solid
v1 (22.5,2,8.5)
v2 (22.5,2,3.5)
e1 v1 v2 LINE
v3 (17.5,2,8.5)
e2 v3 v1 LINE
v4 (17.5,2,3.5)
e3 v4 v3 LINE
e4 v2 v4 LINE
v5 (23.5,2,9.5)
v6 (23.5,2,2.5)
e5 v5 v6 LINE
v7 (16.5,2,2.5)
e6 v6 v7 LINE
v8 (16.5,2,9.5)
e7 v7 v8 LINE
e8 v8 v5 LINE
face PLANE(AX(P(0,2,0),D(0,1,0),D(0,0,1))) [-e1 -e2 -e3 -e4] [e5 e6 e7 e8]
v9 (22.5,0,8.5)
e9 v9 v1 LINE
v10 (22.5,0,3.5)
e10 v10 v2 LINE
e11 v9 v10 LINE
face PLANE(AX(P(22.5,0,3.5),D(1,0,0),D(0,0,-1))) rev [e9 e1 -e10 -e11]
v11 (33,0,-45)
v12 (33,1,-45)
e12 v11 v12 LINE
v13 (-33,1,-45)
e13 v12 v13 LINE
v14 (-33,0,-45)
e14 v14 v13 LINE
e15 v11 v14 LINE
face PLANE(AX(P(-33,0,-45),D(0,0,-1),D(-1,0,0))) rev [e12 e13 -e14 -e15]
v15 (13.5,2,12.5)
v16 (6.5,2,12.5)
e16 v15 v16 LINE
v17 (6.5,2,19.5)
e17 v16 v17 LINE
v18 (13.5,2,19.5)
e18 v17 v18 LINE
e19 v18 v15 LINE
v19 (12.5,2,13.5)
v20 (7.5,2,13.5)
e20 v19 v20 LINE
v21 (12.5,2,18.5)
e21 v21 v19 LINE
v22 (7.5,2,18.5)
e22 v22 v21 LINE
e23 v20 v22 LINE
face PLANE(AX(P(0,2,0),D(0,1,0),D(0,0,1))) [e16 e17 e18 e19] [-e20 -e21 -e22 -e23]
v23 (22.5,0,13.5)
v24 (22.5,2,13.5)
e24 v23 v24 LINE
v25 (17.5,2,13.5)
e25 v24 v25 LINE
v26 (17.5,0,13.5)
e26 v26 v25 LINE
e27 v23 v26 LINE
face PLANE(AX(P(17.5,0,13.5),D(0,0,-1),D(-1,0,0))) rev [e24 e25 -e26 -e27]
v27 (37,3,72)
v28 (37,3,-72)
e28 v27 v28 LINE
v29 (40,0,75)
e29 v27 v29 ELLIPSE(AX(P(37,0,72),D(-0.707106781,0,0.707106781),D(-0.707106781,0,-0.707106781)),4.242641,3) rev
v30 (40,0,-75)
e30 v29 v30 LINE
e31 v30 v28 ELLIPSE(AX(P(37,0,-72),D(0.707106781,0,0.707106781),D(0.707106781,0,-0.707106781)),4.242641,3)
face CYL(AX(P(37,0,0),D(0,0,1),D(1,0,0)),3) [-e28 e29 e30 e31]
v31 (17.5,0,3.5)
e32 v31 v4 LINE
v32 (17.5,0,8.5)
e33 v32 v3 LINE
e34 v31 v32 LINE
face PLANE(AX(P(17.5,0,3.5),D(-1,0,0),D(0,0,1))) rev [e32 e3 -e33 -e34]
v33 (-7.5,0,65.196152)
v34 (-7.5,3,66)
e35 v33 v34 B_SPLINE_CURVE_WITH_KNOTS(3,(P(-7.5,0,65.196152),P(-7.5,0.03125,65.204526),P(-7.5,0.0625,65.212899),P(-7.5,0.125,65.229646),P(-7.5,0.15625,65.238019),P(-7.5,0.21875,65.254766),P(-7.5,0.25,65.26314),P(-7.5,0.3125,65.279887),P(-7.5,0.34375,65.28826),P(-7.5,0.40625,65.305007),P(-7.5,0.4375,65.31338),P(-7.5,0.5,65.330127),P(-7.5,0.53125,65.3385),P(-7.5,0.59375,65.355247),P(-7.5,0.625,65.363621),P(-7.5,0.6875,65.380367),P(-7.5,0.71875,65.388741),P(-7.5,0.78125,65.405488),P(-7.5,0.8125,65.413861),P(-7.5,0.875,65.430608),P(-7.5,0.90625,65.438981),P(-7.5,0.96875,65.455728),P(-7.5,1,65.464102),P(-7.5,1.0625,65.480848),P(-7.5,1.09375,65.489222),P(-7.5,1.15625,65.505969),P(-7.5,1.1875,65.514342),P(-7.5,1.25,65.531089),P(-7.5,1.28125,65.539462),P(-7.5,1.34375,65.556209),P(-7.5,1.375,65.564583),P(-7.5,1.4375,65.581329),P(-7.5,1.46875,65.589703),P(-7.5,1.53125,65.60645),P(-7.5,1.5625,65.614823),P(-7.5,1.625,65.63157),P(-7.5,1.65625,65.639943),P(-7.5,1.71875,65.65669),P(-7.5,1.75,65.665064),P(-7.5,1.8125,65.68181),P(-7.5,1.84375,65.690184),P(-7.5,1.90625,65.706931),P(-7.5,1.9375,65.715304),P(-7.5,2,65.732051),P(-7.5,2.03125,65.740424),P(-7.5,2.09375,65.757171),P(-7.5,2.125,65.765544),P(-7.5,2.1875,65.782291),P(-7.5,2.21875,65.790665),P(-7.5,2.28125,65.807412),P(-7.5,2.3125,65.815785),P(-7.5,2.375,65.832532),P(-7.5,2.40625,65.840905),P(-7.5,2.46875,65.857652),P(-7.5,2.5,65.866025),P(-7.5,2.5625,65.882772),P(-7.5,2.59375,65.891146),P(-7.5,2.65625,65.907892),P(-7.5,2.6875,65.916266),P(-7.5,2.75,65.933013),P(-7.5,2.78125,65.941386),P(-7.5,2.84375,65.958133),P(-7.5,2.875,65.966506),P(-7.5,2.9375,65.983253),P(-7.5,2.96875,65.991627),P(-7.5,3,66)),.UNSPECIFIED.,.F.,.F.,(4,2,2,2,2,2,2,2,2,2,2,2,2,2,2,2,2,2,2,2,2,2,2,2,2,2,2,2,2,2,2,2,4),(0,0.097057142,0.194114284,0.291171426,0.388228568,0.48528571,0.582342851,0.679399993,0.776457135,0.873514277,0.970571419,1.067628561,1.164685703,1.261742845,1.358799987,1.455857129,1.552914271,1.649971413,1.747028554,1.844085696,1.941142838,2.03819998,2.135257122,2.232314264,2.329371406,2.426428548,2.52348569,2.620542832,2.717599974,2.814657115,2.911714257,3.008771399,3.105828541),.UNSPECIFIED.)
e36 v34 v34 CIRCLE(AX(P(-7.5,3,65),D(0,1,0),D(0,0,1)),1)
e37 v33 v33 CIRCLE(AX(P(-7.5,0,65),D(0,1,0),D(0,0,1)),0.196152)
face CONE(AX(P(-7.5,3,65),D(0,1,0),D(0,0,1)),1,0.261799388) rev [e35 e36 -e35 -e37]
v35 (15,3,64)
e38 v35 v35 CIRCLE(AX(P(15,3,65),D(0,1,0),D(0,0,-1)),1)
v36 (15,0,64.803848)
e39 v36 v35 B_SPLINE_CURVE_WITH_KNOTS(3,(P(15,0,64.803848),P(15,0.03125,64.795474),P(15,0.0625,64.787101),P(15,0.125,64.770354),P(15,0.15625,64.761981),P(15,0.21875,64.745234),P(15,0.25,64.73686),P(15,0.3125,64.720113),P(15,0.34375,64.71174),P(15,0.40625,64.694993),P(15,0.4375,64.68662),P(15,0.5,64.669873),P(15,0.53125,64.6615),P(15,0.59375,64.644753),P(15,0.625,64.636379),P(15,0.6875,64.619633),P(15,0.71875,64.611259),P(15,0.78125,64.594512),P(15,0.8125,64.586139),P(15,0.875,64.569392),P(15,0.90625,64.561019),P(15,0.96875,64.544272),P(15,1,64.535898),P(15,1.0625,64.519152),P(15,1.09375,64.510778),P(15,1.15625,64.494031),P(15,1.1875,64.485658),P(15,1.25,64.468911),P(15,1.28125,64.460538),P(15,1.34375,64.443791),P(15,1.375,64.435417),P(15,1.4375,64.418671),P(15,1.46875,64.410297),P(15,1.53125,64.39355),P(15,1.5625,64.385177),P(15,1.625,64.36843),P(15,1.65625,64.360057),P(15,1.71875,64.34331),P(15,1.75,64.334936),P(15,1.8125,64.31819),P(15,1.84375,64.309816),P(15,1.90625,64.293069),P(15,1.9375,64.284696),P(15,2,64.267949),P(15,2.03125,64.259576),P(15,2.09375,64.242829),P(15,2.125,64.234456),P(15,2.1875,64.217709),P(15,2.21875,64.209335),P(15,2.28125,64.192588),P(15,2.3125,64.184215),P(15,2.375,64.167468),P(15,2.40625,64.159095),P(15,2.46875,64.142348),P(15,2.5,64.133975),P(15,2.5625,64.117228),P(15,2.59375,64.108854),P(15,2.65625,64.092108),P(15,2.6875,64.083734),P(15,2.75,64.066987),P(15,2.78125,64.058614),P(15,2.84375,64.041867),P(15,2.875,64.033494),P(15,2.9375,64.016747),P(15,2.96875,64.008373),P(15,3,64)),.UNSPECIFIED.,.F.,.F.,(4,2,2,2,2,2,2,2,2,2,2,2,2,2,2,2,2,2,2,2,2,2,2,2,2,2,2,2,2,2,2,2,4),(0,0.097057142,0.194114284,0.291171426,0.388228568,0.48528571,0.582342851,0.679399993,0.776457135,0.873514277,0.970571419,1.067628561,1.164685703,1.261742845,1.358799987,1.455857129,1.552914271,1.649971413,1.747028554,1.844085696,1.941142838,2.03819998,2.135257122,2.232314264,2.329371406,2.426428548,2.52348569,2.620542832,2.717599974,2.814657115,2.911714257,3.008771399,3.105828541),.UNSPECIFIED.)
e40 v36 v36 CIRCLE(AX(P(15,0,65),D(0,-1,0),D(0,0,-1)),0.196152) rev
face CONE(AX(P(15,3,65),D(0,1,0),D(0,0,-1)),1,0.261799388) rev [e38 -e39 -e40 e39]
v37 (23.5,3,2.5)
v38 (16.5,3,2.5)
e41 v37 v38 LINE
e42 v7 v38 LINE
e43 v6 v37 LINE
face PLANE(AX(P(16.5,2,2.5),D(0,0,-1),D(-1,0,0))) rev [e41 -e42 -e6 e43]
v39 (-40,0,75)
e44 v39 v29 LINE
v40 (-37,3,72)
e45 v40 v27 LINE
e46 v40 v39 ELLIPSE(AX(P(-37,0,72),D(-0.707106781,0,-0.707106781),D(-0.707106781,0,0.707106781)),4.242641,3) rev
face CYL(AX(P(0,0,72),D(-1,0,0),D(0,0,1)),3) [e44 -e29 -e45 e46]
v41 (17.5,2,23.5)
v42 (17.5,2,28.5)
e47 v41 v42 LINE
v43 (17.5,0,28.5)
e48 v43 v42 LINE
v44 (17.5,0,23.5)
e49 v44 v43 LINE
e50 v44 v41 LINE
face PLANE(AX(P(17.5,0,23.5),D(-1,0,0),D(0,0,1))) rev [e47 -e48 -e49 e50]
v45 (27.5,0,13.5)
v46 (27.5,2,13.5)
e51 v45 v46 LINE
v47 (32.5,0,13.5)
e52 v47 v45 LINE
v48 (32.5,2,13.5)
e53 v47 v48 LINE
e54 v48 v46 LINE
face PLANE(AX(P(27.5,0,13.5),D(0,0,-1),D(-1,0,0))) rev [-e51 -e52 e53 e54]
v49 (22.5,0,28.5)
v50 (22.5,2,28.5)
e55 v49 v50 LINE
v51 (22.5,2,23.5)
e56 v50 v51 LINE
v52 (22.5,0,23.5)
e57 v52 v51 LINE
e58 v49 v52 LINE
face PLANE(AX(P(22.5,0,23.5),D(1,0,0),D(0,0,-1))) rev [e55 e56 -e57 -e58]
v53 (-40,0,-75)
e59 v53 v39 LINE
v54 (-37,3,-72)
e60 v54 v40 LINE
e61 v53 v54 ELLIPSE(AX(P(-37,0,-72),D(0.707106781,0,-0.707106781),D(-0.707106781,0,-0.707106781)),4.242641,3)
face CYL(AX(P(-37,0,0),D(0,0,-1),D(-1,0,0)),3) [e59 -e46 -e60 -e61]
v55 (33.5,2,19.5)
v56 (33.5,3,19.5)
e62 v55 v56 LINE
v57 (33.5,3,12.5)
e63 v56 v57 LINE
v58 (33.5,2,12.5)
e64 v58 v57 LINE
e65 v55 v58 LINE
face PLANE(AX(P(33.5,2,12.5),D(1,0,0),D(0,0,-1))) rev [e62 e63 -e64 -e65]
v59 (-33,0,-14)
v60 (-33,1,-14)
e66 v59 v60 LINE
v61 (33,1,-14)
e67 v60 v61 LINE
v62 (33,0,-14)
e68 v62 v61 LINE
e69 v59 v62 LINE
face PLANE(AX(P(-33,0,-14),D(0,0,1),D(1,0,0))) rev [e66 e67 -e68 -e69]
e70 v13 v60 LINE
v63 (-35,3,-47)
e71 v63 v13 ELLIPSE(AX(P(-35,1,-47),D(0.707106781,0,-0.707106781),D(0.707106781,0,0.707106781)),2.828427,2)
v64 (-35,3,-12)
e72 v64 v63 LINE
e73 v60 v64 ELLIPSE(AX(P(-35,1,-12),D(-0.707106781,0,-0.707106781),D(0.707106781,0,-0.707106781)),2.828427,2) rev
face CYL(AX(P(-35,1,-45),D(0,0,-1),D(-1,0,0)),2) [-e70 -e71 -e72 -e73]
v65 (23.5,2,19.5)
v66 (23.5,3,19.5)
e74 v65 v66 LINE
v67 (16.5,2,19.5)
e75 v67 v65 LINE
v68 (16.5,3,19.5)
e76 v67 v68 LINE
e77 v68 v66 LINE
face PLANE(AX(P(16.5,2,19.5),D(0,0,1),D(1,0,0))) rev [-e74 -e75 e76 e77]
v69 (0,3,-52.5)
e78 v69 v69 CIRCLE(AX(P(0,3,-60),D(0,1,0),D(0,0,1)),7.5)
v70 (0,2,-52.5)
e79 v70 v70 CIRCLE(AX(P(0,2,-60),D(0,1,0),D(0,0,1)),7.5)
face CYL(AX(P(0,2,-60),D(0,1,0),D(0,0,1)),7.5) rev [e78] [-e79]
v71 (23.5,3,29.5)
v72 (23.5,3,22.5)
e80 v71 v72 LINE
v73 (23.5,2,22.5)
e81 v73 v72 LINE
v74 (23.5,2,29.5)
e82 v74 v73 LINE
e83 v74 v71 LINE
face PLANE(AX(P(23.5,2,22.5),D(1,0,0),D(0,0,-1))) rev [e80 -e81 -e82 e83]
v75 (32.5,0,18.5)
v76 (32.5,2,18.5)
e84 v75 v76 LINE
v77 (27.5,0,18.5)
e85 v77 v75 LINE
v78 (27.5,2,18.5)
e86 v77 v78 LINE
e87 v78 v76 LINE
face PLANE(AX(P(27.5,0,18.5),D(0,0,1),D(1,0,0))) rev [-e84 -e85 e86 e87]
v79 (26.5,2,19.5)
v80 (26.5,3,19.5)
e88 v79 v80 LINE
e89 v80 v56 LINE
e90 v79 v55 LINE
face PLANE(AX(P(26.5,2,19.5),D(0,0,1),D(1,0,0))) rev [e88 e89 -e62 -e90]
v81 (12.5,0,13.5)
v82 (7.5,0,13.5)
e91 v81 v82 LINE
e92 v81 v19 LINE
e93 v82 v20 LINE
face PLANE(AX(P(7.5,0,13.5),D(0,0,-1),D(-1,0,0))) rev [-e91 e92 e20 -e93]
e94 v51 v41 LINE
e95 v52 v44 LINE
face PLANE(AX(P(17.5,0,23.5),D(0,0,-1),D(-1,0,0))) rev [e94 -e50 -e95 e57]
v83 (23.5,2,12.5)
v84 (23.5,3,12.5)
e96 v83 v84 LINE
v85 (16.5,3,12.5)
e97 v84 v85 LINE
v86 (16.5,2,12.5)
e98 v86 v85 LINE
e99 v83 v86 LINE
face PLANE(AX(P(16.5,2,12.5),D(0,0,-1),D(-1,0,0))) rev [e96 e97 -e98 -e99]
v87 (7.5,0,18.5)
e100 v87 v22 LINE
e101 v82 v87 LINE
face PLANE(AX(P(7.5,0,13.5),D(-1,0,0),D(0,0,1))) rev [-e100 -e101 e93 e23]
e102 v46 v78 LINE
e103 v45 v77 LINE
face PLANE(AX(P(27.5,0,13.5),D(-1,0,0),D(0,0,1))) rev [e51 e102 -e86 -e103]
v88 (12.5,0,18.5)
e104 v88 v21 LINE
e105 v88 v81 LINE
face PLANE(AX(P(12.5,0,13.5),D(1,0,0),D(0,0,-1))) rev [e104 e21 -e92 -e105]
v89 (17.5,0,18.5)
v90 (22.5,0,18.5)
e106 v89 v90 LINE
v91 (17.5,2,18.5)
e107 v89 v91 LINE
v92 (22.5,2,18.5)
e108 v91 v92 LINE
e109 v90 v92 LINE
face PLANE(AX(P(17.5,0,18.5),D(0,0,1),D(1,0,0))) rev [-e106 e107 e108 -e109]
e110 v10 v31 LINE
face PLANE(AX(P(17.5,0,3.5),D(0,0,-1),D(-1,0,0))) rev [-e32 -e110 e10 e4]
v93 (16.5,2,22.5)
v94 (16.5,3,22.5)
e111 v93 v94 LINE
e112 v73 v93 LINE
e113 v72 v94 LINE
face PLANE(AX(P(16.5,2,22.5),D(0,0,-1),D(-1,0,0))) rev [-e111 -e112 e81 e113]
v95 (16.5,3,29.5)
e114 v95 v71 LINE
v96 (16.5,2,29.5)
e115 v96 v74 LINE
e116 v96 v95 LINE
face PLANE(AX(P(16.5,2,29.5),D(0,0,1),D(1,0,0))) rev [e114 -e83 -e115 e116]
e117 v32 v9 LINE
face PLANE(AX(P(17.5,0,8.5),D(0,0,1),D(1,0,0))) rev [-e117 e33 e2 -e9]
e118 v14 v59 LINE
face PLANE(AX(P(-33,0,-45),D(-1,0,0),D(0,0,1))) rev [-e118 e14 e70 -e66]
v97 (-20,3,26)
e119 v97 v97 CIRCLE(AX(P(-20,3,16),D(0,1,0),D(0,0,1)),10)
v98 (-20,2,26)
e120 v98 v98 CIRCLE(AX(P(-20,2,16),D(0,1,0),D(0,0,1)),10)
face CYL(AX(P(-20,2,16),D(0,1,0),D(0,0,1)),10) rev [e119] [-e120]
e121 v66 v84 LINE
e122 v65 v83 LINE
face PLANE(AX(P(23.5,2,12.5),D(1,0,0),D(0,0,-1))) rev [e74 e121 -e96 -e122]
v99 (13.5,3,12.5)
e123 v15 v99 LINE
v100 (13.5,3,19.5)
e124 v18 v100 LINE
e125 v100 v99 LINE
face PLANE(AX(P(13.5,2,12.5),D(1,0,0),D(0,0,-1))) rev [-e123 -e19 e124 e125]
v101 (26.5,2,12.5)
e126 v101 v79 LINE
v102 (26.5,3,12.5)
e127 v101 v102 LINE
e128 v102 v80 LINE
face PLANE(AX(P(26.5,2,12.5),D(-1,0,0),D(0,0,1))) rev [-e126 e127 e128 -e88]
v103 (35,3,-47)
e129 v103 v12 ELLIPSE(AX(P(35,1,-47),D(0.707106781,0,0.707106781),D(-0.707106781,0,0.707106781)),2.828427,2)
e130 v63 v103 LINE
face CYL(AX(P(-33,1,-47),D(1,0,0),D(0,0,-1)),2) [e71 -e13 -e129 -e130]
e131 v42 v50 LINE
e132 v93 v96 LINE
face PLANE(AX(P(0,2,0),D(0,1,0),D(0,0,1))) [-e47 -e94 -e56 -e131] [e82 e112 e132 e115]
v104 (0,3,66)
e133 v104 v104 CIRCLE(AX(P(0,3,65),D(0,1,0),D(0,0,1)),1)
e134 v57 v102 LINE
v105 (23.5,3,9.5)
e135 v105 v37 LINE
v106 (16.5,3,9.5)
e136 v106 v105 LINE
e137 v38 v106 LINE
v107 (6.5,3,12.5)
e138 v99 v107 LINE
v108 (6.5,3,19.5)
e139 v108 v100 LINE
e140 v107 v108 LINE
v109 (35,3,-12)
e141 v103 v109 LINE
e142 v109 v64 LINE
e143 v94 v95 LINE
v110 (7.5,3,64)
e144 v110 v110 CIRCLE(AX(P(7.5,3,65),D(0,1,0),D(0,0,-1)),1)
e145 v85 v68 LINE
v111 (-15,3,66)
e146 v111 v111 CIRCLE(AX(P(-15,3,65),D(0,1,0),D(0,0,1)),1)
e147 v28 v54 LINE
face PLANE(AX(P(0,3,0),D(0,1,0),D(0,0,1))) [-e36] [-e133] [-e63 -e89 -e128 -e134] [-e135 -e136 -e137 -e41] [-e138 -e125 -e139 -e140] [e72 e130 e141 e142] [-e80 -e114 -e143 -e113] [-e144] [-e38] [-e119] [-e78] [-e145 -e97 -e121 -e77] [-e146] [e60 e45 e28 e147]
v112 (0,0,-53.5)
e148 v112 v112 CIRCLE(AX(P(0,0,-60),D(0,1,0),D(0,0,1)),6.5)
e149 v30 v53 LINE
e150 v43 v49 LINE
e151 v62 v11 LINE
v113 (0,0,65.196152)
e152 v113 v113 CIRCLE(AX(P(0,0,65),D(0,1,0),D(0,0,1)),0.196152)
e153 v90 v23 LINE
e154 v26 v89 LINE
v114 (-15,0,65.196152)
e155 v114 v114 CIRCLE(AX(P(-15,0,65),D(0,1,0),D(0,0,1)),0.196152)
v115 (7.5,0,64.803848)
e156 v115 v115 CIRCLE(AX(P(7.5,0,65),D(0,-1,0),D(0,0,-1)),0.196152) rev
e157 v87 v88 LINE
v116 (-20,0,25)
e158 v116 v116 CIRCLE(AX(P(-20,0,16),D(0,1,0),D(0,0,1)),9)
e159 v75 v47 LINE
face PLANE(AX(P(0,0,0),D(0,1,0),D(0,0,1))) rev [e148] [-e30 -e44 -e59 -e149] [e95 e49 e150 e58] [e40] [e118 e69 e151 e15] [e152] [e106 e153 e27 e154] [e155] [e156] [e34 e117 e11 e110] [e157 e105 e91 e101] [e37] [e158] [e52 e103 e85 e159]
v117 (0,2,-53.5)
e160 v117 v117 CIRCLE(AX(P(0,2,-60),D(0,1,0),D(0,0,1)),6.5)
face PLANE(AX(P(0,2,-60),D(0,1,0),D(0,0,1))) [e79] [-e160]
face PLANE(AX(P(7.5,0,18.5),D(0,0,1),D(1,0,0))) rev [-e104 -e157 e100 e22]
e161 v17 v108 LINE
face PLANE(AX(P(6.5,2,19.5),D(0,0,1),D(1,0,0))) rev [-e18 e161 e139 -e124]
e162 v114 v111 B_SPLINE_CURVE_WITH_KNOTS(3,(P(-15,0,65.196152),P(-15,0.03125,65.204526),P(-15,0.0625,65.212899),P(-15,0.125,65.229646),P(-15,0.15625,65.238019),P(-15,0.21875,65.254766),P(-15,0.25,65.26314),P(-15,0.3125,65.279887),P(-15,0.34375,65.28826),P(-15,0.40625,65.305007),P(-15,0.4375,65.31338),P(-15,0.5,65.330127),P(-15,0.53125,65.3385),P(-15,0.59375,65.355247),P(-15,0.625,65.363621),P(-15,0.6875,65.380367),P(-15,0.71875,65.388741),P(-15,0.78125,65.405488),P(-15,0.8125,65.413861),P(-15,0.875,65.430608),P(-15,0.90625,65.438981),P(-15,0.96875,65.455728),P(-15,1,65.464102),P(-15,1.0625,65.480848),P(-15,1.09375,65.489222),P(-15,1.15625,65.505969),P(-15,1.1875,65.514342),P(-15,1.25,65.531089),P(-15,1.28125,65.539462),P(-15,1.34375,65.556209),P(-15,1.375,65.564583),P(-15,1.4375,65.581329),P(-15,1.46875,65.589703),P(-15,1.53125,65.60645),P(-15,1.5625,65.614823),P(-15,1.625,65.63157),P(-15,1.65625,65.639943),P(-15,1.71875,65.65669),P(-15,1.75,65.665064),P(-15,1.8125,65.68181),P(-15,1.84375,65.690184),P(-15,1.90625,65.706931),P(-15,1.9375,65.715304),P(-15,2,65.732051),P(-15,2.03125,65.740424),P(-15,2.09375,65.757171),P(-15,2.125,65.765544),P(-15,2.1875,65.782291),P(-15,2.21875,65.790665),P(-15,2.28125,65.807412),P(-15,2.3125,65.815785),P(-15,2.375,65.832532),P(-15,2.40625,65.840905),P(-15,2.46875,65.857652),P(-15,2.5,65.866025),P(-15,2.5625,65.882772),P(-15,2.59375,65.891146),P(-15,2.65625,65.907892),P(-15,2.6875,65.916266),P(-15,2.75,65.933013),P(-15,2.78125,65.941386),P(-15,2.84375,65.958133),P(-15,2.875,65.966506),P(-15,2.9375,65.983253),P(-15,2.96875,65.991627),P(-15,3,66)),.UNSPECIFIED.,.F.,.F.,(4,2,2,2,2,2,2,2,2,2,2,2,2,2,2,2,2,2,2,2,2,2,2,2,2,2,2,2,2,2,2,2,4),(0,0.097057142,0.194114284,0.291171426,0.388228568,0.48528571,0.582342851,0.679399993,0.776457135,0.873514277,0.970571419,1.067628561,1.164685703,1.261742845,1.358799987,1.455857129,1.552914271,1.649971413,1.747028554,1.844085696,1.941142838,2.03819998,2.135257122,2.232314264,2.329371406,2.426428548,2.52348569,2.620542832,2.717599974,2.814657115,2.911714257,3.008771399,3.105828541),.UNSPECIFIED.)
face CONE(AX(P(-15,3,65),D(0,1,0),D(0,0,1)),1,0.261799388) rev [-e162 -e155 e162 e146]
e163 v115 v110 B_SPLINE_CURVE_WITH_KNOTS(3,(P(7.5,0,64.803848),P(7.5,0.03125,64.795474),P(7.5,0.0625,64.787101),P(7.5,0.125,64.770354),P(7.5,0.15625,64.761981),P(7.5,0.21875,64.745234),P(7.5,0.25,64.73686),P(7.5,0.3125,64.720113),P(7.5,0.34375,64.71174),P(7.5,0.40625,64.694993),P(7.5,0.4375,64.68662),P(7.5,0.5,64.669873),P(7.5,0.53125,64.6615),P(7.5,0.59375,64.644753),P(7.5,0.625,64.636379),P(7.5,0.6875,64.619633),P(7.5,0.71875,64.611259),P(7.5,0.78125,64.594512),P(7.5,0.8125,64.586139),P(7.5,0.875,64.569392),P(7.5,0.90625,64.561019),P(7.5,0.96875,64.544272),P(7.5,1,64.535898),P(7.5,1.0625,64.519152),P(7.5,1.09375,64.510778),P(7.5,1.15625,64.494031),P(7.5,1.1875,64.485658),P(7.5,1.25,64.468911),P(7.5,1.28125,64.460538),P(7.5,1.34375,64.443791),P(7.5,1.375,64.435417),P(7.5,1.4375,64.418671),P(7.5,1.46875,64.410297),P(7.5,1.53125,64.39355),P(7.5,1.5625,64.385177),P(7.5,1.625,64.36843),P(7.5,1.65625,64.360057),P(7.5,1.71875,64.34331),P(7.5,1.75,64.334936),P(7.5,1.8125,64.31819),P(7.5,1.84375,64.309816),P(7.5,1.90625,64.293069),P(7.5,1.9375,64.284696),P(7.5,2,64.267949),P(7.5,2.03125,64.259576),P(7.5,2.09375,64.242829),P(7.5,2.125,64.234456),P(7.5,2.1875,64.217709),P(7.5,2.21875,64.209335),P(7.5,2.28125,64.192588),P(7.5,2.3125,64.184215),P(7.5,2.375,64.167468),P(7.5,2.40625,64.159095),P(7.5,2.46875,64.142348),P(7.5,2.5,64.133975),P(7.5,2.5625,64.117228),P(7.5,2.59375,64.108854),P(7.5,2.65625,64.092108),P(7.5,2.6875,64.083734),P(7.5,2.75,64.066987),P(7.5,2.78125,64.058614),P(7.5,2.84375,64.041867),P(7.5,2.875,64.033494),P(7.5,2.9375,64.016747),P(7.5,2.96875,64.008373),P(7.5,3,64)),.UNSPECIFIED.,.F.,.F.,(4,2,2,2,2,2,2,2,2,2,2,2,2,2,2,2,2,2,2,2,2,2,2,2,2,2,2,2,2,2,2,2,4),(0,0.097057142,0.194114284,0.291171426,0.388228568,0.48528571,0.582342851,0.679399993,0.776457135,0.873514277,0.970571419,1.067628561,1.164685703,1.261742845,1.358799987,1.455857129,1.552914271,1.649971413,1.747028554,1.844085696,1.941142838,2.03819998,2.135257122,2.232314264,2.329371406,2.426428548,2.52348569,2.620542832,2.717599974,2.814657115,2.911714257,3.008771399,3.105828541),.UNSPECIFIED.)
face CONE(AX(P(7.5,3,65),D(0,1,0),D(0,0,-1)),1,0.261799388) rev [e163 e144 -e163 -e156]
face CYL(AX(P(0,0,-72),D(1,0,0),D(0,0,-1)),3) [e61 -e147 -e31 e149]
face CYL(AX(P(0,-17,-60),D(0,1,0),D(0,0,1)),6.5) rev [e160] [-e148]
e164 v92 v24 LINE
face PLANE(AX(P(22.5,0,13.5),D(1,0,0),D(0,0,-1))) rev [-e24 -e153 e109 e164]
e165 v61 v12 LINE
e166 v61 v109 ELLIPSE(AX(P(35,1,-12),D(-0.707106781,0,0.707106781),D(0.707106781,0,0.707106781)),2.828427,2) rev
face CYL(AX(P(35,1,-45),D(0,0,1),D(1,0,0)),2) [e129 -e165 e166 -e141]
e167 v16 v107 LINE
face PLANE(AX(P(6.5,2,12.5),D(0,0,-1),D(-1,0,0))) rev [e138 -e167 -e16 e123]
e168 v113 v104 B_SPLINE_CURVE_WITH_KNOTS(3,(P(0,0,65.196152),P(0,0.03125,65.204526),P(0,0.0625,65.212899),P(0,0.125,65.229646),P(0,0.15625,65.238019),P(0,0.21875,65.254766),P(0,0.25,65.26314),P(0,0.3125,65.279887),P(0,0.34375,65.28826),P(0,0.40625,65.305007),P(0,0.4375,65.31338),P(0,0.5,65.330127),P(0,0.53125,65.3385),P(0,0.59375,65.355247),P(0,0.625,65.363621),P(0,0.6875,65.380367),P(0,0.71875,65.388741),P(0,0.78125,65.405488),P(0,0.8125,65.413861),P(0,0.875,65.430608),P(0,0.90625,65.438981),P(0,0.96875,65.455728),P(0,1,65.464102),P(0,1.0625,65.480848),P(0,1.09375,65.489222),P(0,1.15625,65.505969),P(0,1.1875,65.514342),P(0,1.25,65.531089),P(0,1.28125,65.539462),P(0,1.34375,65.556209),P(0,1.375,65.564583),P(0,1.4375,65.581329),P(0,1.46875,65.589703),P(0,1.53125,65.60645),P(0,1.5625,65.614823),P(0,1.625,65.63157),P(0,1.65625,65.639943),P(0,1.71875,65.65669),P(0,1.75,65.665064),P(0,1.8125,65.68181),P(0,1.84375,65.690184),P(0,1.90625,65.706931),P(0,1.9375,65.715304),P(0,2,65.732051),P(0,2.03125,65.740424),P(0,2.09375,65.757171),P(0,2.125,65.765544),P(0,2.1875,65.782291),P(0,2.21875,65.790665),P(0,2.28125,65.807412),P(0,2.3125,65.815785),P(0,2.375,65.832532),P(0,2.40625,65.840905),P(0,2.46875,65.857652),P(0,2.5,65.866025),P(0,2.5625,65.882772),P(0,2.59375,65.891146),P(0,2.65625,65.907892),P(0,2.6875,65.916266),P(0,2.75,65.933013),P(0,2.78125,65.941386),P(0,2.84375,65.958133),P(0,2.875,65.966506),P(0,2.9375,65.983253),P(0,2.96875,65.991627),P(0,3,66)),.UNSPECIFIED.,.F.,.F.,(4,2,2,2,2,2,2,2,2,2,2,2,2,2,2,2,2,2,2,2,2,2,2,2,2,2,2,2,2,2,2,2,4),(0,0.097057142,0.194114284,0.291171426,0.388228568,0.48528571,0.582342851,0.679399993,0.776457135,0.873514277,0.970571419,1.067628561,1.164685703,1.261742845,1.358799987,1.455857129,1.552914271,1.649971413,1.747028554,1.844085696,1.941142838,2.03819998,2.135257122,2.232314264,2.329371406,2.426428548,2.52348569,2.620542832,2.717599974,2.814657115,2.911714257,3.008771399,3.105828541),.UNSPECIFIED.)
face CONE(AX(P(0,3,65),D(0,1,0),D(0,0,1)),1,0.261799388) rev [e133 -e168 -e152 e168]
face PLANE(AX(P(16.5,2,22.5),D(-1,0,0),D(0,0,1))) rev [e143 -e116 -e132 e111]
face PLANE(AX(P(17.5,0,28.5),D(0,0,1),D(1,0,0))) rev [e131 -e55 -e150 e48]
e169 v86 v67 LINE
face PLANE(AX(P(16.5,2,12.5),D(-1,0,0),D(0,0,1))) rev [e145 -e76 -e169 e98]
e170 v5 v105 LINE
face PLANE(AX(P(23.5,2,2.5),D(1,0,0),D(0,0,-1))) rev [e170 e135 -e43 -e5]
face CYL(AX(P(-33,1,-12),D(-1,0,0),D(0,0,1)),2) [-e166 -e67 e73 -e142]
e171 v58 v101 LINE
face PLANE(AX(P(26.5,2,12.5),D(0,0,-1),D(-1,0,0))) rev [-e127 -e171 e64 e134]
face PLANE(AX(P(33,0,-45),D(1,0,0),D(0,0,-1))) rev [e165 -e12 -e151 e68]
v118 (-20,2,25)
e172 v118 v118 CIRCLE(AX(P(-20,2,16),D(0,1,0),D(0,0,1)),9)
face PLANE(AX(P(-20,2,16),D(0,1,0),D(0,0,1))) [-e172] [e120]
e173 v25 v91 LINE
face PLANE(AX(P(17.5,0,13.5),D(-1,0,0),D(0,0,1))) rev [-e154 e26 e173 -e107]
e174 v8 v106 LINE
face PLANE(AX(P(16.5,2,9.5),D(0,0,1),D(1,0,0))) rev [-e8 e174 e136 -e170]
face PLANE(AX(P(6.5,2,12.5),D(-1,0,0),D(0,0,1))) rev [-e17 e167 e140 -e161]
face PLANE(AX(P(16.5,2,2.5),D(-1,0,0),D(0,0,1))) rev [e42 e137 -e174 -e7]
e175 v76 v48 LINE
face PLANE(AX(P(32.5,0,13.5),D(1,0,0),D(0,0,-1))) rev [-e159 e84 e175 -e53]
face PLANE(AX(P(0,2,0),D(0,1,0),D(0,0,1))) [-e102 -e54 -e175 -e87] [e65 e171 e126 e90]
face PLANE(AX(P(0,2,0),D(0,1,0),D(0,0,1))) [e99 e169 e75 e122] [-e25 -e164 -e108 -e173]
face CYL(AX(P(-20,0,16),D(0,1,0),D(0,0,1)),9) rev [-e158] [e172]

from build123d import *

# Parameters (mm, degrees)
SKETCH1_W           = 80
SKETCH1_H           = 150
BOSS_EXTRUDE1_DEPTH = 3
SKETCH2_W           = 66
SKETCH2_H           = 31
CUT_EXTRUDE1_DEPTH  = 3
SKETCH4_R           = 7.5
CUT_EXTRUDE2_DEPTH  = 1
SKETCH5_R           = 6.5
CUT_EXTRUDE3_DEPTH  = 19
SKETCH6_R           = 10
CUT_EXTRUDE4_DEPTH  = 1
SKETCH8_R           = 9
CUT_EXTRUDE5_DEPTH  = 86.023526156
SKETCH9_W           = 7
SKETCH9_H           = 7
CUT_EXTRUDE6_DEPTH  = 1
SKETCH12_W          = 5
SKETCH12_H          = 5
CUT_EXTRUDE7_DEPTH  = 86.023526156
FILLET1_R           = 3
FILLET2_R           = 2
SKETCH15_W          = 7
SKETCH15_H          = 7
CUT_EXTRUDE9_DEPTH  = 1
SKETCH16_W          = 5
SKETCH16_H          = 5
CUT_EXTRUDE10_DEPTH = 86.023526156


with BuildPart() as part:
    # Sketch1 → Boss-Extrude1 (new body)
    with BuildSketch(Plane(origin=(0, 0, 0), x_dir=(1, 0, 0), z_dir=(0, 1, 0))):
        Rectangle(SKETCH1_W, SKETCH1_H)
    extrude(amount=BOSS_EXTRUDE1_DEPTH)

    # Sketch2 → Cut-Extrude1 (cut)
    with BuildSketch(Plane(origin=(0, 3, 0), x_dir=(1, 0, 0), z_dir=(0, 1, 0))):
        with Locations((0, 29.5)):
            Rectangle(SKETCH2_W, SKETCH2_H)
    extrude(amount=-CUT_EXTRUDE1_DEPTH, mode=Mode.SUBTRACT)

    # Sketch4 → Cut-Extrude2 (cut)
    with BuildSketch(Plane(origin=(0, 3, 0), x_dir=(1, 0, 0), z_dir=(0, 1, 0))):
        with Locations(Location((0, 60, 0), (0, 0, 270))):
            Circle(SKETCH4_R)
    extrude(amount=-CUT_EXTRUDE2_DEPTH, mode=Mode.SUBTRACT)

    # Sketch5 → Cut-Extrude3 (cut)
    with BuildSketch(Plane(origin=(0, 2, 0), x_dir=(1, 0, 0), z_dir=(0, 1, 0))):
        with Locations(Location((0, 60, 0), (0, 0, 270))):
            Circle(SKETCH5_R)
    extrude(amount=-CUT_EXTRUDE3_DEPTH, mode=Mode.SUBTRACT)

    # Sketch6 → Cut-Extrude4 (cut)
    with BuildSketch(Plane(origin=(0, 3, 0), x_dir=(1, 0, 0), z_dir=(0, 1, 0))):
        with Locations(Location((-20, -16, 0), (0, 0, 270))):
            Circle(SKETCH6_R)
    extrude(amount=-CUT_EXTRUDE4_DEPTH, mode=Mode.SUBTRACT)

    # Sketch8 → Cut-Extrude5 (cut, through all)
    with BuildSketch(Plane(origin=(0, 2, 0), x_dir=(1, 0, 0), z_dir=(0, 1, 0))):
        with Locations(Location((-20, -16, 0), (0, 0, 270))):
            Circle(SKETCH8_R)
    extrude(amount=-CUT_EXTRUDE5_DEPTH, mode=Mode.SUBTRACT)

    # Sketch9 → Cut-Extrude6 (cut)
    with BuildSketch(Plane(origin=(0, 3, 0), x_dir=(1, 0, 0), z_dir=(0, 1, 0))):
        with Locations((20, -6)):
            Rectangle(SKETCH9_W, SKETCH9_H)
        with Locations((20, -26)):
            Rectangle(SKETCH9_W, SKETCH9_H)
        with Locations((10, -16)):
            Rectangle(SKETCH9_W, SKETCH9_H)
        with Locations((30, -16)):
            Rectangle(SKETCH9_W, SKETCH9_H)
    extrude(amount=-CUT_EXTRUDE6_DEPTH, mode=Mode.SUBTRACT)

    # Sketch12 → Cut-Extrude7 (cut, through all)
    with BuildSketch(Plane(origin=(0, 2, 0), x_dir=(1, 0, 0), z_dir=(0, 1, 0))):
        with Locations((20, -6)):
            Rectangle(SKETCH12_W, SKETCH12_H)
        with Locations((10, -16)):
            Rectangle(SKETCH12_W, SKETCH12_H)
        with Locations((30, -16)):
            Rectangle(SKETCH12_W, SKETCH12_H)
        with Locations((20, -26)):
            Rectangle(SKETCH12_W, SKETCH12_H)
    extrude(amount=-CUT_EXTRUDE7_DEPTH, mode=Mode.SUBTRACT)

    # Cut-Extrude8 cone 1 section (through the dimple's axis) → Cut-Extrude8 (revolve, cut)
    with BuildSketch(Plane(origin=(0, 3, 65), x_dir=(0, 0, 1), z_dir=(1, 0, 0))):
        Polygon((0, 0), (1, 0), (0, 3.732050808), align=None)
    revolve(axis=Axis((0, 3, 65), (0, -1, 0)), mode=Mode.SUBTRACT)

    # Cut-Extrude8 cone 2 section (through the dimple's axis) → Cut-Extrude8 cone 2 (revolve, cut)
    with BuildSketch(Plane(origin=(-7.5, 3, 65), x_dir=(0, 0, 1), z_dir=(1, 0, 0))):
        Polygon((0, 0), (1, 0), (0, 3.732050808), align=None)
    revolve(axis=Axis((-7.5, 3, 65), (0, -1, 0)), mode=Mode.SUBTRACT)

    # Cut-Extrude8 cone 3 section (through the dimple's axis) → Cut-Extrude8 cone 3 (revolve, cut)
    with BuildSketch(Plane(origin=(-15, 3, 65), x_dir=(0, 0, 1), z_dir=(1, 0, 0))):
        Polygon((0, 0), (1, 0), (0, 3.732050808), align=None)
    revolve(axis=Axis((-15, 3, 65), (0, -1, 0)), mode=Mode.SUBTRACT)

    # Cut-Extrude8 cone 4 section (through the dimple's axis) → Cut-Extrude8 cone 4 (revolve, cut)
    with BuildSketch(Plane(origin=(7.5, 3, 65), x_dir=(0, 0, 1), z_dir=(1, 0, 0))):
        Polygon((0, 0), (1, 0), (0, 3.732050808), align=None)
    revolve(axis=Axis((7.5, 3, 65), (0, -1, 0)), mode=Mode.SUBTRACT)

    # Cut-Extrude8 cone 5 section (through the dimple's axis) → Cut-Extrude8 cone 5 (revolve, cut)
    with BuildSketch(Plane(origin=(15, 3, 65), x_dir=(0, 0, 1), z_dir=(1, 0, 0))):
        Polygon((0, 0), (1, 0), (0, 3.732050808), align=None)
    revolve(axis=Axis((15, 3, 65), (0, -1, 0)), mode=Mode.SUBTRACT)

    # Fillet1
    fillet1_edges = [part.edges().sort_by_distance(p)[0] for p in [
        (40, 3, 0),
        (0, 3, -75),
        (-40, 3, 0),
        (0, 3, 75),
    ]]
    fillet(fillet1_edges, radius=FILLET1_R - 0.0001)  # a hair under: the kernel refuses the full size

    # Fillet2
    fillet2_edges = [part.edges().sort_by_distance(p)[0] for p in [
        (33, 3, -29.5),
        (0, 3, -45),
        (-33, 3, -29.5),
        (0, 3, -14),
    ]]
    fillet(fillet2_edges, radius=FILLET2_R)

    # Sketch15 → Cut-Extrude9 (cut)
    with BuildSketch(Plane(origin=(0, 3, 0), x_dir=(1, 0, 0), z_dir=(0, 1, 0))):
        with Locations((20, -16)):
            Rectangle(SKETCH15_W, SKETCH15_H)
    extrude(amount=-CUT_EXTRUDE9_DEPTH, mode=Mode.SUBTRACT)

    # Sketch16 → Cut-Extrude10 (cut, through all)
    with BuildSketch(Plane(origin=(0, 2, 0), x_dir=(1, 0, 0), z_dir=(0, 1, 0))):
        with Locations((20, -16)):
            Rectangle(SKETCH16_W, SKETCH16_H)
    extrude(amount=-CUT_EXTRUDE10_DEPTH, mode=Mode.SUBTRACT)


solid = part.part
